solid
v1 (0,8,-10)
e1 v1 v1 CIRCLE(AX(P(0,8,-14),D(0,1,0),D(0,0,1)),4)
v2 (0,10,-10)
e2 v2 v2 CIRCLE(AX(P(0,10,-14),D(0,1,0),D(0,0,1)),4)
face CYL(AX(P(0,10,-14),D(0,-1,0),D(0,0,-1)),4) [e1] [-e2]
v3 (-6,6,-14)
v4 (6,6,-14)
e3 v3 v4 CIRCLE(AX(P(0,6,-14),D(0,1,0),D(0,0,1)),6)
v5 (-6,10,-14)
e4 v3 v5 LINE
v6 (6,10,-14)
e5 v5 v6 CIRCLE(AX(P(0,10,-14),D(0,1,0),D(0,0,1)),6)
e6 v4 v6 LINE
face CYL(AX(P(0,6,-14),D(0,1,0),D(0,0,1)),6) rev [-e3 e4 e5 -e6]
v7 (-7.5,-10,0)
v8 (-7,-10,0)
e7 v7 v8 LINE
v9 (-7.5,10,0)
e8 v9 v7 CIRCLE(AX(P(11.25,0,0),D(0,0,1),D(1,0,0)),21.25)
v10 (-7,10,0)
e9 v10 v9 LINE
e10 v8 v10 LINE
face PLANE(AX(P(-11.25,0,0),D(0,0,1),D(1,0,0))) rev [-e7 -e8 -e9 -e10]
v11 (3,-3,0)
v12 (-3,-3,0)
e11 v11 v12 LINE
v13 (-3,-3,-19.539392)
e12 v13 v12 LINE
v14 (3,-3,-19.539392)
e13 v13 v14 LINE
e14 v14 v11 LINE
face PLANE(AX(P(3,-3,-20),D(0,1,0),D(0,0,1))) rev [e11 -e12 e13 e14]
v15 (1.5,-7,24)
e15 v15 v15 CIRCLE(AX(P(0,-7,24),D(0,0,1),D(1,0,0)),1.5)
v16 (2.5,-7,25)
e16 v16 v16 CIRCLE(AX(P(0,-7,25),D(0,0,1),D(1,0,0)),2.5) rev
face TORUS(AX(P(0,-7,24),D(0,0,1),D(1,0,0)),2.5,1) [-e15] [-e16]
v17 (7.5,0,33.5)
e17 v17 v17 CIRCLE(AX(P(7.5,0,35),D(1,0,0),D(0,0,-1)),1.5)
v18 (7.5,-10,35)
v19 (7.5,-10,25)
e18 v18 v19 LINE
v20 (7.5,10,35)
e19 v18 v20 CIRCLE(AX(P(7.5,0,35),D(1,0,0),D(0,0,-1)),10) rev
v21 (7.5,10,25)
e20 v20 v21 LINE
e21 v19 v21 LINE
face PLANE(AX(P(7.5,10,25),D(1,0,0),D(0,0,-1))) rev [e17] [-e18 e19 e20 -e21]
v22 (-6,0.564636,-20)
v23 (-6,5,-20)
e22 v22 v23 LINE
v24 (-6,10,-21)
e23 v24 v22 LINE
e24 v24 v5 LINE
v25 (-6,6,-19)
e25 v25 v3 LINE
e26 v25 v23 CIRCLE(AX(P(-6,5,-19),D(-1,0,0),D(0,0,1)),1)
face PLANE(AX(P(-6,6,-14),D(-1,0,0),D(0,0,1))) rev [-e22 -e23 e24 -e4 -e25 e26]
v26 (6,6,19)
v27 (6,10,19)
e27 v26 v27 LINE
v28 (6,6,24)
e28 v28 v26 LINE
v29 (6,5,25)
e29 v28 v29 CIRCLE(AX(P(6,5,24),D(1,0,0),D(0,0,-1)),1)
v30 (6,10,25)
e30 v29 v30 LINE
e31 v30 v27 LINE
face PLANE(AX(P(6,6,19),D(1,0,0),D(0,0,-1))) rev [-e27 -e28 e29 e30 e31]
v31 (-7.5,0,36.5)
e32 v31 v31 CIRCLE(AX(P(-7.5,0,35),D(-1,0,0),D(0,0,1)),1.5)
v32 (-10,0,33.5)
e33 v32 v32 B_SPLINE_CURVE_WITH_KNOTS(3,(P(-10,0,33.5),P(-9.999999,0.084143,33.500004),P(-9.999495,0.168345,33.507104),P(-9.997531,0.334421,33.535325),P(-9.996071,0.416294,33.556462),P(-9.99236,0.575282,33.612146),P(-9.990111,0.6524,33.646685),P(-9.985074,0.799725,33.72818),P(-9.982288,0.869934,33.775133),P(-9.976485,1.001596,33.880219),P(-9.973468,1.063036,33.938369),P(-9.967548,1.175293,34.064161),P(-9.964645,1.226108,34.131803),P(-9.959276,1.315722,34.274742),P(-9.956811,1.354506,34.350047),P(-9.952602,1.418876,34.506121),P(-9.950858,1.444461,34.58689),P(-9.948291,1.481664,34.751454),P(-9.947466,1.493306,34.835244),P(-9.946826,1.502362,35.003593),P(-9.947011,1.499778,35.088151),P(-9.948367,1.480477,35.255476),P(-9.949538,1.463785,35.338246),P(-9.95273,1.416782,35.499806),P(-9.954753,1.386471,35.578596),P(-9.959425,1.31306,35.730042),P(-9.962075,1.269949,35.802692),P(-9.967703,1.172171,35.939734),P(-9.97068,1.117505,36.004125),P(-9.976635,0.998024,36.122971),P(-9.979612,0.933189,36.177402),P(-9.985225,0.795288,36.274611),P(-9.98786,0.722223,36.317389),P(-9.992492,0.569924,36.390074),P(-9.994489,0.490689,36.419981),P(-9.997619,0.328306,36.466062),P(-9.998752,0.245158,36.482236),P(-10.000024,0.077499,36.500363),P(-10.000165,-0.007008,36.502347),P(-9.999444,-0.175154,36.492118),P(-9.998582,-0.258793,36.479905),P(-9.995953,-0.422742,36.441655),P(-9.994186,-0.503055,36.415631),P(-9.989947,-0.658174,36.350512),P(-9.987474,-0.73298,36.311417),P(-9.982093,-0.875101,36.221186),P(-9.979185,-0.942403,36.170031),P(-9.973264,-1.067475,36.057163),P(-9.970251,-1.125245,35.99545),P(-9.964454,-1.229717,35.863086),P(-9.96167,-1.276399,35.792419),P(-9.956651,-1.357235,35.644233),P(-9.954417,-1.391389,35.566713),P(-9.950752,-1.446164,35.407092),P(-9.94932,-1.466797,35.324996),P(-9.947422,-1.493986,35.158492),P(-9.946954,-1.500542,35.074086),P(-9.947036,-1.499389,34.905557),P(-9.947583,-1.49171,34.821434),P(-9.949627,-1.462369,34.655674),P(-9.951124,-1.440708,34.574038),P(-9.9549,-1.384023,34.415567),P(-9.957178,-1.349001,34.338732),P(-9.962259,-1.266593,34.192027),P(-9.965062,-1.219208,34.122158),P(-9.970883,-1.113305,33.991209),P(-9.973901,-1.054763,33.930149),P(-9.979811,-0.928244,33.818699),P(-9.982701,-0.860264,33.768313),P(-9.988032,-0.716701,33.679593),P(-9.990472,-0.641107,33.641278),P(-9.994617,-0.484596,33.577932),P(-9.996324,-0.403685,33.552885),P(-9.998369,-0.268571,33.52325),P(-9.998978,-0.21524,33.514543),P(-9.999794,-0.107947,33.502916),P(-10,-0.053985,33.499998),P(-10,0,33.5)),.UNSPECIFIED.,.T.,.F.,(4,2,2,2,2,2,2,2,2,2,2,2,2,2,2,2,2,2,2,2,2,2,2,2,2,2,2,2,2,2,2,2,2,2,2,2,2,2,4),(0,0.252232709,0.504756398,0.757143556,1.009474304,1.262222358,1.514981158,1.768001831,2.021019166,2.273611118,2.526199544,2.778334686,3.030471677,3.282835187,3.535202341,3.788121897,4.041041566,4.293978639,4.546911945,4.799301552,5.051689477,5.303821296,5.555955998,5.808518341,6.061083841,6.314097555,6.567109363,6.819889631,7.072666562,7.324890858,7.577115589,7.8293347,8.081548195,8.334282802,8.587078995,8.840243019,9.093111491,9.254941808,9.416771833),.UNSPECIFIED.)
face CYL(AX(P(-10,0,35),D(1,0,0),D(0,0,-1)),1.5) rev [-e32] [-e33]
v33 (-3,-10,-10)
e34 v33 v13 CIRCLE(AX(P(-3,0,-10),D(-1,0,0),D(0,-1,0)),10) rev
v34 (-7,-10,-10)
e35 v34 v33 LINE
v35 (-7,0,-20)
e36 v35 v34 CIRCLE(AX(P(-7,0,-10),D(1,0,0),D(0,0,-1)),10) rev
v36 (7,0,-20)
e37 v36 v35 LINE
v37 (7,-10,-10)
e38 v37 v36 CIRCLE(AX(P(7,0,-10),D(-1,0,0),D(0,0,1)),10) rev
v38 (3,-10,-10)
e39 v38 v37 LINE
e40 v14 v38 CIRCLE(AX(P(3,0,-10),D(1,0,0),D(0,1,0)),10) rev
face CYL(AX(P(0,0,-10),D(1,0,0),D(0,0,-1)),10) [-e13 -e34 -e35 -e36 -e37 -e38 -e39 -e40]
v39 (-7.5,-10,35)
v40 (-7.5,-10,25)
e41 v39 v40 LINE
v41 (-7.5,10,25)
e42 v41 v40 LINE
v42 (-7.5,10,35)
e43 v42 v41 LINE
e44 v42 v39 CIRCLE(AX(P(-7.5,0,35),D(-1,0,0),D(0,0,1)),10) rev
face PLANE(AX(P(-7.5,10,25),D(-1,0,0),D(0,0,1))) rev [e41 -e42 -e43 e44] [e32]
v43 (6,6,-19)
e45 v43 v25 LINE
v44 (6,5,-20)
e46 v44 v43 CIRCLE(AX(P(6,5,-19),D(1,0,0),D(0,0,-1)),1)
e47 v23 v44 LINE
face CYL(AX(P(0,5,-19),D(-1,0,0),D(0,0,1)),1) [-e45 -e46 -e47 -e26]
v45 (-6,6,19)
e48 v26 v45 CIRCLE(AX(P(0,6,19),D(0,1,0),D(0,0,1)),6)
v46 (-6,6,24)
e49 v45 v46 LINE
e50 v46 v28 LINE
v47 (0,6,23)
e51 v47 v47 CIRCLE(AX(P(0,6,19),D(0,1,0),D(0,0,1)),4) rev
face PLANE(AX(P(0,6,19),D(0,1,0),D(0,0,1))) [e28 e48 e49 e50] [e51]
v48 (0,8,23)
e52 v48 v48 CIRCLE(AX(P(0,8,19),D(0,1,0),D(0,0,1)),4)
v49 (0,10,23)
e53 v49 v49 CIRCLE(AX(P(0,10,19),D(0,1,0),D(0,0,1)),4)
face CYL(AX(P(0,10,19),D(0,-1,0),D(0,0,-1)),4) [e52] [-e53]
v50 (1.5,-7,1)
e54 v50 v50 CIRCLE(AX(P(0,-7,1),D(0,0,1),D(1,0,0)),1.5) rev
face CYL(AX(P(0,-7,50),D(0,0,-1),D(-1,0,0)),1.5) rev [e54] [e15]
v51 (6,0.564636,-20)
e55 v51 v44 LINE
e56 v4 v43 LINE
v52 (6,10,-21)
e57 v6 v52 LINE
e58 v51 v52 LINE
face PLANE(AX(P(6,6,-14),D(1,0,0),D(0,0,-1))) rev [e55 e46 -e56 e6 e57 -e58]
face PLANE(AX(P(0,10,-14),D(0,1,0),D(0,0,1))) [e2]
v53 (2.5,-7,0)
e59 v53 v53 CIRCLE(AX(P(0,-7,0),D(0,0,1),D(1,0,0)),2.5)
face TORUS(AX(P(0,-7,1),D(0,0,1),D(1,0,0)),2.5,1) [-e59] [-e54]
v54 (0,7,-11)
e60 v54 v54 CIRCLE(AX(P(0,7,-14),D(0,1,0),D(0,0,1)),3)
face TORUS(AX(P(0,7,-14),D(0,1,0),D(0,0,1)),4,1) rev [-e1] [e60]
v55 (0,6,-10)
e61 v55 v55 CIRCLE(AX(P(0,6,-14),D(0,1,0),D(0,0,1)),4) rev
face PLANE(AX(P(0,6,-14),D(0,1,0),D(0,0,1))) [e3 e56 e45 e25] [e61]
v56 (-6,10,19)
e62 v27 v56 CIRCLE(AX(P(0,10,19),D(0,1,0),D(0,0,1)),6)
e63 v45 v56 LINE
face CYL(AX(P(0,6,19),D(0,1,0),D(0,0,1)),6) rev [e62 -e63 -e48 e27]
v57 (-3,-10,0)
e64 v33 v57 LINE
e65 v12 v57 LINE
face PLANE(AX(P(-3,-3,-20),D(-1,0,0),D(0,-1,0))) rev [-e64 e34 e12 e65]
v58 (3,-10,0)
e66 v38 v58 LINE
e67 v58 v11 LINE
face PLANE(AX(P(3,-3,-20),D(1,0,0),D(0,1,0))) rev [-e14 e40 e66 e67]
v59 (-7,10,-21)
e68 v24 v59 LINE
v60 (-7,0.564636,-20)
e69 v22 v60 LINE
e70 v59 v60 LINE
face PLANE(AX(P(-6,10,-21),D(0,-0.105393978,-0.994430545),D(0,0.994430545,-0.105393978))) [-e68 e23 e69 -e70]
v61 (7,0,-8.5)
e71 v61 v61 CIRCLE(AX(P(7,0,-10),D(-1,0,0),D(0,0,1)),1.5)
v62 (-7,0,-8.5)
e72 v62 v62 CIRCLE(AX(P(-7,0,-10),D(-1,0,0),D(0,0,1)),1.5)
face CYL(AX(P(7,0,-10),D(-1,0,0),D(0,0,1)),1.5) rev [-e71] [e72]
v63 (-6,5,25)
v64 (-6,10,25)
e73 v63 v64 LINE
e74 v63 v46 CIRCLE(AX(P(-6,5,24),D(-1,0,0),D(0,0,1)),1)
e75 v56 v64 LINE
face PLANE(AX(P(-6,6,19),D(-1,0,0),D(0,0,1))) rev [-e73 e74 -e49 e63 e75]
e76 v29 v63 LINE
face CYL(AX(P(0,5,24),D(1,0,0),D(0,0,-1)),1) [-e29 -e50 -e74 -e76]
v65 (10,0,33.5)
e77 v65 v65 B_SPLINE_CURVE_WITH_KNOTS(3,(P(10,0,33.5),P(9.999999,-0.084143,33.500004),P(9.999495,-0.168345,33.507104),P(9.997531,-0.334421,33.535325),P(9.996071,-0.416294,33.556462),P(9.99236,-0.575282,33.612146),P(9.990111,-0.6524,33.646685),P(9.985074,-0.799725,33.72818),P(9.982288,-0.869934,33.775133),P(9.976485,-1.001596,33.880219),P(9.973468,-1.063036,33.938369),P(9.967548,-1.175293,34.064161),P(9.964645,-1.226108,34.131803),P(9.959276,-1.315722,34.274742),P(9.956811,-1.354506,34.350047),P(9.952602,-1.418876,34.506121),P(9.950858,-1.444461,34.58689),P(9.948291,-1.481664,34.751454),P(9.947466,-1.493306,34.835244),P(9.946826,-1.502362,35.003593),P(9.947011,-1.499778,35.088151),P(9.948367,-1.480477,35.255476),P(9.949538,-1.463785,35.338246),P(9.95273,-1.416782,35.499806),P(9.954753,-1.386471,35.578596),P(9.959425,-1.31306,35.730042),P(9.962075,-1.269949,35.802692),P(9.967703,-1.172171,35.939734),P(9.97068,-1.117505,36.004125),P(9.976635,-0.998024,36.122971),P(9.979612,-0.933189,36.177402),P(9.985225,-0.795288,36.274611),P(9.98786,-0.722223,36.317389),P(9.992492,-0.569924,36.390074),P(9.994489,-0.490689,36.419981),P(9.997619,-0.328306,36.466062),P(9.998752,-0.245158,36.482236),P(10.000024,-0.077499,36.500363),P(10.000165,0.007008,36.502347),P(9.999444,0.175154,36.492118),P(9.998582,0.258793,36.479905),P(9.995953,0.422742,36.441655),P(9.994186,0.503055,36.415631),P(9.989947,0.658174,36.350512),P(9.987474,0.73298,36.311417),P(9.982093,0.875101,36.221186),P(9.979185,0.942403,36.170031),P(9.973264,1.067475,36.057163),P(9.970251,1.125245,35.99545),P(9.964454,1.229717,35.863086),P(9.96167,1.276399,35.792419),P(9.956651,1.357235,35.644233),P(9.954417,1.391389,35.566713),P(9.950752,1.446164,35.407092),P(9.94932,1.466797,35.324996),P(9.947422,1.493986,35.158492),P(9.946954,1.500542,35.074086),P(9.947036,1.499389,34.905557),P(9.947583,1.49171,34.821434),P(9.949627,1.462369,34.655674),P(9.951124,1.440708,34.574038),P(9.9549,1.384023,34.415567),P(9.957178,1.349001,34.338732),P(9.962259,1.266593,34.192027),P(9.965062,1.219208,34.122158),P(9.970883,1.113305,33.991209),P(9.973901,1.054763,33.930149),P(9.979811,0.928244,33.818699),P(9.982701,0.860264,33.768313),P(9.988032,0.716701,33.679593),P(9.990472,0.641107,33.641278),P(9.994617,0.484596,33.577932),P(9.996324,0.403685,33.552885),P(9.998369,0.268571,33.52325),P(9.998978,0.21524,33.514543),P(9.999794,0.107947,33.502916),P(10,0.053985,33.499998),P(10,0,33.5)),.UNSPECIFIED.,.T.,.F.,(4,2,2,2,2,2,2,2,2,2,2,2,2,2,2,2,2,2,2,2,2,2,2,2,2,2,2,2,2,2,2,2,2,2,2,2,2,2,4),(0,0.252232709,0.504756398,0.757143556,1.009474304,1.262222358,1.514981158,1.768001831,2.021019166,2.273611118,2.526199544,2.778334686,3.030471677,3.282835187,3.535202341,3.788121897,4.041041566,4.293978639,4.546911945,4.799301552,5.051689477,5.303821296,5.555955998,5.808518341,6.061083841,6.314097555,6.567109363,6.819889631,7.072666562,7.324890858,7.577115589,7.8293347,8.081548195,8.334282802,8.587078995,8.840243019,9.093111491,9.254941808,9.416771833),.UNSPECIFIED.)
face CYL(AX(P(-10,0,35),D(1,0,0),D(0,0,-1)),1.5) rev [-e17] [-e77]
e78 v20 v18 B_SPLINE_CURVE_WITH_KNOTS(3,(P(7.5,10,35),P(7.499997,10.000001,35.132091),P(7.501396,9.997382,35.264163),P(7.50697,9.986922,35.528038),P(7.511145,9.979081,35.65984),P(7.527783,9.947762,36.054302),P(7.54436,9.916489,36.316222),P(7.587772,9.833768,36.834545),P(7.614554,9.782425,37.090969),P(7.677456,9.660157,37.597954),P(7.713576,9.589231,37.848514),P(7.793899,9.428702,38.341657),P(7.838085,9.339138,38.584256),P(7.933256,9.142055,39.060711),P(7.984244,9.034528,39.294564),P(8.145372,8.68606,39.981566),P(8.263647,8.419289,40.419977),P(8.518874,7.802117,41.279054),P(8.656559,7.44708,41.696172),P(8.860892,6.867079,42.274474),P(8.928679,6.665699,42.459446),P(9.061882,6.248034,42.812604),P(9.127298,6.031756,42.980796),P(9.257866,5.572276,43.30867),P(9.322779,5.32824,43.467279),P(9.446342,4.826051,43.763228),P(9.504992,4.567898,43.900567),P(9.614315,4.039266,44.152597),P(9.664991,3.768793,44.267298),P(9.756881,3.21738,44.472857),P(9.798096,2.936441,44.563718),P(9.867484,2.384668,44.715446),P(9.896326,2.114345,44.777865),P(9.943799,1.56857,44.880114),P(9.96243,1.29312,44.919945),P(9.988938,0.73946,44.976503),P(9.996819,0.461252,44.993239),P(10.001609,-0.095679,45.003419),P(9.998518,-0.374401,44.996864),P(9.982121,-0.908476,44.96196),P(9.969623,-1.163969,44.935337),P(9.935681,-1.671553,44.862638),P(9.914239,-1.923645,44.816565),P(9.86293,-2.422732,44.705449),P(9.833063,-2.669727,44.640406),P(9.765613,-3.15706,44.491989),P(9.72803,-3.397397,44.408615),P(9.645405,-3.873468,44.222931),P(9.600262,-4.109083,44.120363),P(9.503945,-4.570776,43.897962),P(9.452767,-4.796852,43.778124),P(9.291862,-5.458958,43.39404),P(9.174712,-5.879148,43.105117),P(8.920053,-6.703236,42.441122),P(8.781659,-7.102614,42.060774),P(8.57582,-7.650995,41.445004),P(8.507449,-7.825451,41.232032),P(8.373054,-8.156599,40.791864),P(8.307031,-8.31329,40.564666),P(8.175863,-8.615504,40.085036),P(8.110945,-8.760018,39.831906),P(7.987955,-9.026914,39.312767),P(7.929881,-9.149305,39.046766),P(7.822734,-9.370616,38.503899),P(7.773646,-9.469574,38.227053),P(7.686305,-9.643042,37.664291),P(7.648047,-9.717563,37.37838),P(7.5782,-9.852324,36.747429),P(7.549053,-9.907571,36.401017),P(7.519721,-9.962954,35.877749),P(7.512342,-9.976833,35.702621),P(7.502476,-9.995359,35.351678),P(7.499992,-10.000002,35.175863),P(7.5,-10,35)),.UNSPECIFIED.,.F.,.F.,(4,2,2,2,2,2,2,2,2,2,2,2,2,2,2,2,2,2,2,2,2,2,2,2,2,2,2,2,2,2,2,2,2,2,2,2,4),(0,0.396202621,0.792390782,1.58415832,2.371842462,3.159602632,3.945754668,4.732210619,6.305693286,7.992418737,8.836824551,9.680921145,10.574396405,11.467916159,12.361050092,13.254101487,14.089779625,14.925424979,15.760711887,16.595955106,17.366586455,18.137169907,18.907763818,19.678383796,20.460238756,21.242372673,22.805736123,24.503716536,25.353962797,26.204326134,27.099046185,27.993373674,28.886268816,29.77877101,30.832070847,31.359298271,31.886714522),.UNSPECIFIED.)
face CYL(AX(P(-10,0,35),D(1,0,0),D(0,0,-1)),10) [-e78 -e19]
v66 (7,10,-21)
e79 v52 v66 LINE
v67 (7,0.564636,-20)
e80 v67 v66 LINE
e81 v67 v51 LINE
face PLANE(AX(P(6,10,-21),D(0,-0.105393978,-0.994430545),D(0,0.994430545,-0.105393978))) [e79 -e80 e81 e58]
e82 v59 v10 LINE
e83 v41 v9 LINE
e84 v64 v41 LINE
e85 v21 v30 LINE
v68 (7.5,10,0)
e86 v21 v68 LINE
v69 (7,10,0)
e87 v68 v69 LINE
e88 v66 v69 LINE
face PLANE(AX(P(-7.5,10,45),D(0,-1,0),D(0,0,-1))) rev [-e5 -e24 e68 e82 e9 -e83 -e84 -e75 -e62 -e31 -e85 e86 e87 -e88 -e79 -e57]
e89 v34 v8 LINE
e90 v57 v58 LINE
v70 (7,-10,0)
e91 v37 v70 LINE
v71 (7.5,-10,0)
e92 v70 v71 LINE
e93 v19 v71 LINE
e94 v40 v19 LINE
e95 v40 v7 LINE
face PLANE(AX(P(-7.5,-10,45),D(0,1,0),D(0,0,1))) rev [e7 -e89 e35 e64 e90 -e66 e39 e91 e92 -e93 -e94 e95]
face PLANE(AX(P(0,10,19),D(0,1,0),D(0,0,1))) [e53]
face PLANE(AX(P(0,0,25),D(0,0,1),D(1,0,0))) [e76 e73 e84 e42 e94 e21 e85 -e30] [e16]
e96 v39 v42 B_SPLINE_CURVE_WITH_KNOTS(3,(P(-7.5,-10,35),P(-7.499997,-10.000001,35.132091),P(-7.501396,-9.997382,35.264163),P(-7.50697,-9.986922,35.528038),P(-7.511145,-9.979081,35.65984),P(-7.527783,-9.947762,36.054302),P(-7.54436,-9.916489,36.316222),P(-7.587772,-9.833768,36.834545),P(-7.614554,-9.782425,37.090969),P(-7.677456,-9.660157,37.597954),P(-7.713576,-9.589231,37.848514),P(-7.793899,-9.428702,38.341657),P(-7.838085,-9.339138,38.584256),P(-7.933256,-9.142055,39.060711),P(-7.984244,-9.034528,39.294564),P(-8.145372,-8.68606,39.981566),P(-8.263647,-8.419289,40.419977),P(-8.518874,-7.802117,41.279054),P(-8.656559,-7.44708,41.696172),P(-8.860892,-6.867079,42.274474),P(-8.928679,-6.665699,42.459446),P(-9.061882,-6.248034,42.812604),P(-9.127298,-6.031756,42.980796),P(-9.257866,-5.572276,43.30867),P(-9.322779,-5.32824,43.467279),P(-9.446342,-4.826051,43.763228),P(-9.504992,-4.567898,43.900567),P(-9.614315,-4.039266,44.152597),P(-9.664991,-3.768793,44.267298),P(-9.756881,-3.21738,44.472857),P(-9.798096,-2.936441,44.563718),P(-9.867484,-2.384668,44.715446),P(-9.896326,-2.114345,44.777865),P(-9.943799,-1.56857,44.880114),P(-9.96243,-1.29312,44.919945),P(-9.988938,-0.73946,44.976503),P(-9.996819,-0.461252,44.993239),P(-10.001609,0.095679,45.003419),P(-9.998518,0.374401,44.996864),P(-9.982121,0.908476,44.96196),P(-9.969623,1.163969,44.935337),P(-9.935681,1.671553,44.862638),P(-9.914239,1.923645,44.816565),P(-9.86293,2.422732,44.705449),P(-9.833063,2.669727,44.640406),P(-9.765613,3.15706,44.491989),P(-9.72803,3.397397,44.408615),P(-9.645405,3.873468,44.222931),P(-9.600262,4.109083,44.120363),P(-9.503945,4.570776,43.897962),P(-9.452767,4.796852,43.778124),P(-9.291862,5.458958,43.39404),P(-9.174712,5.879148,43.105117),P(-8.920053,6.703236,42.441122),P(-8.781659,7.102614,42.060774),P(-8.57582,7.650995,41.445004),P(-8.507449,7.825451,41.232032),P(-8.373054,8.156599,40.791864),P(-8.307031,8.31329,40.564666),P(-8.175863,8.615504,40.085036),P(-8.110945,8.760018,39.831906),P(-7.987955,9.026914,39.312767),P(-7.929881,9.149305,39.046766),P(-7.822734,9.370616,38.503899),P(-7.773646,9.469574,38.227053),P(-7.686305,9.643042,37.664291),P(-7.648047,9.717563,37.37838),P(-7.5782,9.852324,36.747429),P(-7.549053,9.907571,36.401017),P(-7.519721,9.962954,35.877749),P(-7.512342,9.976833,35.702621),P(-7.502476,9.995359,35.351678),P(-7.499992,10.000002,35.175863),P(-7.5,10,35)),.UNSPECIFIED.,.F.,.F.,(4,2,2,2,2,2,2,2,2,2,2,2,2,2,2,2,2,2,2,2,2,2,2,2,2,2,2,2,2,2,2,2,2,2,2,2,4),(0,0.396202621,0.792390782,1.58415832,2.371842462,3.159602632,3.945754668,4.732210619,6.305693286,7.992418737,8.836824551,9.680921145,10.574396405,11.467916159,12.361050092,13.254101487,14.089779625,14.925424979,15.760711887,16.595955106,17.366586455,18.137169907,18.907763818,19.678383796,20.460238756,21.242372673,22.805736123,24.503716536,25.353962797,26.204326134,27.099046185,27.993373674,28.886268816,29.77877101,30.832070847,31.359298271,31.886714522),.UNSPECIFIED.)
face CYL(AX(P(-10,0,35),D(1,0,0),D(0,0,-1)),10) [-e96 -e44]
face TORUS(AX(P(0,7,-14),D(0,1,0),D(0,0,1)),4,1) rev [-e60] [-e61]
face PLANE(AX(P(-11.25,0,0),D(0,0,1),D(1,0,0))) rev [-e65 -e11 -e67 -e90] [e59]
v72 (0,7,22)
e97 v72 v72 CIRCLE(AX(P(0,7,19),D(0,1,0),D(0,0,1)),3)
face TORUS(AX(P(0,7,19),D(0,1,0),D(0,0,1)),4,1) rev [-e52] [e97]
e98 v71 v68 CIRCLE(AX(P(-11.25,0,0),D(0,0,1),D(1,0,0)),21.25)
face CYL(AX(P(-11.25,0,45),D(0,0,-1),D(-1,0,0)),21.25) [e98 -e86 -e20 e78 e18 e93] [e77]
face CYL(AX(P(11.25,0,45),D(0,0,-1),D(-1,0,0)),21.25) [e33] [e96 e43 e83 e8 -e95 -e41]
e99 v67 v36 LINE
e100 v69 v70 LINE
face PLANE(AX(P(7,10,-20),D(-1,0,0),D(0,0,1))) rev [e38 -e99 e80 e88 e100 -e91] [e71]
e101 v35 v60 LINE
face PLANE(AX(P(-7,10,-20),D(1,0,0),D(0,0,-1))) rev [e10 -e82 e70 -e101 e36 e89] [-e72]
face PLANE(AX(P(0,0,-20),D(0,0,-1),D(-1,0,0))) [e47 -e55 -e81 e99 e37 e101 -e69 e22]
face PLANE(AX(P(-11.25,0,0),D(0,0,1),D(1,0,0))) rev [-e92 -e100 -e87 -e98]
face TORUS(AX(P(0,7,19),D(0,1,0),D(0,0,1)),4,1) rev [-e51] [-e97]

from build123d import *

# Parameters (mm, degrees)
SALIENTE_EXTRUIR2_DEPTH    = 45
CROQUIS4_R                 = 1.5
CORTAR_EXTRUIR1_DEPTH      = 50
SALIENTE_EXTRUIR3_DEPTH    = 20
CROQUIS8_R                 = 1.5
CORTAR_EXTRUIR4_DEPTH      = 14
REDONDEO1_R                = 10
CROQUIS6_W                 = 15
CROQUIS6_H                 = 20
CORTAR_EXTRUIR2_DEPTH      = 20
CORTAR_EXTRUIR3_DEPTH      = 48.16990566
CORTAR_EXTRUIR3_DEPTH_BACK = 48.16990566
CROQUIS7_R                 = 1.5
CUT_EXTRUDE1_DEPTH         = 4
SKETCH2_R                  = 3
BOSS_EXTRUDE1_DEPTH        = 2
SKETCH3_R                  = 4
BOSS_EXTRUDE2_DEPTH        = 2
FILLET2_R                  = 1
FILLET3_R                  = 1
FILLET4_R                  = 1
BOSS_EXTRUDE3_DEPTH        = 1
BOSS_EXTRUDE4_DEPTH        = 1


with BuildPart() as part:
    # Croquis2 → Saliente-Extruir2 (new body)
    with BuildSketch(Plane.XY):
        with BuildLine():
            Line((-7.5, -10), (7.5, -10))
            ThreePointArc((7.5, -10), (10, 0), (7.5, 10))
            Line((7.5, 10), (-7.5, 10))
            ThreePointArc((-7.5, 10), (-10, 0), (-7.5, -10))
        make_face()
    extrude(amount=SALIENTE_EXTRUIR2_DEPTH)

    # Croquis4 → Cortar-Extruir1 (cut)
    with BuildSketch(Plane(origin=(0, 0, 0), x_dir=(-1, 0, 0), z_dir=(0, 0, -1))):
        with Locations((0, -7)):
            Circle(CROQUIS4_R)
    extrude(amount=-CORTAR_EXTRUIR1_DEPTH, mode=Mode.SUBTRACT)

    # Croquis3 → Saliente-Extruir3 (add)
    with BuildSketch(Plane(origin=(0, 0, 0), x_dir=(-1, 0, 0), z_dir=(0, 0, -1))):
        Polygon((7, 10), (7, -10), (3, -10), (3, -3), (-3, -3), (-3, -10), (-7, -10), (-7, 10), align=None)
    extrude(amount=SALIENTE_EXTRUIR3_DEPTH)

    # Croquis8 → Cortar-Extruir4 (cut)
    with BuildSketch(Plane.ZY.offset(7)):
        with Locations((-10, 0)):
            Circle(CROQUIS8_R)
    extrude(amount=-CORTAR_EXTRUIR4_DEPTH, mode=Mode.SUBTRACT)

    # Redondeo1
    redondeo1_edges = [part.edges().sort_by_distance(p)[0] for p in [
        (5, -10, -20),
    ]]
    fillet(redondeo1_edges, radius=REDONDEO1_R)

    # Croquis6 → Cortar-Extruir2 (cut)
    with BuildSketch(Plane.XY.offset(45)):
        Rectangle(CROQUIS6_W, CROQUIS6_H)
    extrude(amount=-CORTAR_EXTRUIR2_DEPTH, mode=Mode.SUBTRACT)

    # Croquis7 → Cortar-Extruir3 (cut, two sides: drawn at the far end of the back side and taken through both)
    with BuildSketch(Plane(origin=(0, 0, 0), x_dir=(0, 0, -1), z_dir=(1, 0, 0)).offset(-CORTAR_EXTRUIR3_DEPTH_BACK)):
        with Locations((-35, 0)):
            Circle(CROQUIS7_R)
        with BuildLine():
            Line((-35, -10), (-50, -10))
            Line((-50, -10), (-50, 10))
            Line((-50, 10), (-35, 10))
            ThreePointArc((-35, 10), (-45, 0), (-35, -10))
        make_face()
    extrude(amount=CORTAR_EXTRUIR3_DEPTH + CORTAR_EXTRUIR3_DEPTH_BACK, mode=Mode.SUBTRACT)

    # Sketch1 → Cut-Extrude1 (cut)
    with BuildSketch(Plane(origin=(0, 10, 0), x_dir=(1, 0, 0), z_dir=(0, 1, 0))):
        with BuildLine():
            Line((-6, 14), (-6, 20))
            Line((-6, 20), (6, 20))
            Line((6, 20), (6, 14))
            ThreePointArc((6, 14), (0, 8), (-6, 14))
        make_face()
        with BuildLine():
            Line((-6, -19), (-6, -25))
            Line((-6, -25), (6, -25))
            Line((6, -25), (6, -19))
            ThreePointArc((6, -19), (0, -13), (-6, -19))
        make_face()
    extrude(amount=-CUT_EXTRUDE1_DEPTH, mode=Mode.SUBTRACT)

    # Sketch2 → Boss-Extrude1 (add)
    with BuildSketch(Plane(origin=(0, 6, 0), x_dir=(1, 0, 0), z_dir=(0, 1, 0))):
        with Locations(Location((0, -19, 0), (0, 0, 270))):
            Circle(SKETCH2_R)
        with Locations(Location((0, 14, 0), (0, 0, 270))):
            Circle(SKETCH2_R)
    extrude(amount=BOSS_EXTRUDE1_DEPTH)

    # Sketch3 → Boss-Extrude2 (add)
    with BuildSketch(Plane(origin=(0, 8, 0), x_dir=(1, 0, 0), z_dir=(0, 1, 0))):
        with Locations(Location((0, -19, 0), (0, 0, 270))):
            Circle(SKETCH3_R)
        with Locations(Location((0, 14, 0), (0, 0, 270))):
            Circle(SKETCH3_R)
    extrude(amount=BOSS_EXTRUDE2_DEPTH)

    # Fillet2
    fillet2_edges = [part.edges().sort_by_distance(p)[0] for p in [
        (0, 6, 16),
        (0, 8, 16),
        (0, 6, -17),
        (0, 8, -17),
    ]]
    fillet(fillet2_edges, radius=FILLET2_R - 0.0001)  # a hair under: the kernel refuses the full size

    # Fillet3
    fillet3_edges = [part.edges().sort_by_distance(p)[0] for p in [
        (0, 6, -20),
        (0, 6, 25),
    ]]
    fillet(fillet3_edges, radius=FILLET3_R)

    # Fillet4
    fillet4_edges = [part.edges().sort_by_distance(p)[0] for p in [
        (1.5, -7, 0),
        (1.5, -7, 25),
    ]]
    fillet(fillet4_edges, radius=FILLET4_R)

    # Sketch5 → Boss-Extrude3 (add)
    with BuildSketch(Plane.ZY.offset(7)):
        Polygon((-20, 10), (-21, 10), (-19.670225284, -2.546908511), align=None)
    extrude(amount=-BOSS_EXTRUDE3_DEPTH)

    # Sketch4 → Boss-Extrude4 (add)
    with BuildSketch(Plane(origin=(7, 0, 0), x_dir=(0, 0, -1), z_dir=(1, 0, 0))):
        Polygon((20, 10), (21, 10), (19.670225284, -2.546908511), align=None)
    extrude(amount=-BOSS_EXTRUDE4_DEPTH)


solid = part.part
